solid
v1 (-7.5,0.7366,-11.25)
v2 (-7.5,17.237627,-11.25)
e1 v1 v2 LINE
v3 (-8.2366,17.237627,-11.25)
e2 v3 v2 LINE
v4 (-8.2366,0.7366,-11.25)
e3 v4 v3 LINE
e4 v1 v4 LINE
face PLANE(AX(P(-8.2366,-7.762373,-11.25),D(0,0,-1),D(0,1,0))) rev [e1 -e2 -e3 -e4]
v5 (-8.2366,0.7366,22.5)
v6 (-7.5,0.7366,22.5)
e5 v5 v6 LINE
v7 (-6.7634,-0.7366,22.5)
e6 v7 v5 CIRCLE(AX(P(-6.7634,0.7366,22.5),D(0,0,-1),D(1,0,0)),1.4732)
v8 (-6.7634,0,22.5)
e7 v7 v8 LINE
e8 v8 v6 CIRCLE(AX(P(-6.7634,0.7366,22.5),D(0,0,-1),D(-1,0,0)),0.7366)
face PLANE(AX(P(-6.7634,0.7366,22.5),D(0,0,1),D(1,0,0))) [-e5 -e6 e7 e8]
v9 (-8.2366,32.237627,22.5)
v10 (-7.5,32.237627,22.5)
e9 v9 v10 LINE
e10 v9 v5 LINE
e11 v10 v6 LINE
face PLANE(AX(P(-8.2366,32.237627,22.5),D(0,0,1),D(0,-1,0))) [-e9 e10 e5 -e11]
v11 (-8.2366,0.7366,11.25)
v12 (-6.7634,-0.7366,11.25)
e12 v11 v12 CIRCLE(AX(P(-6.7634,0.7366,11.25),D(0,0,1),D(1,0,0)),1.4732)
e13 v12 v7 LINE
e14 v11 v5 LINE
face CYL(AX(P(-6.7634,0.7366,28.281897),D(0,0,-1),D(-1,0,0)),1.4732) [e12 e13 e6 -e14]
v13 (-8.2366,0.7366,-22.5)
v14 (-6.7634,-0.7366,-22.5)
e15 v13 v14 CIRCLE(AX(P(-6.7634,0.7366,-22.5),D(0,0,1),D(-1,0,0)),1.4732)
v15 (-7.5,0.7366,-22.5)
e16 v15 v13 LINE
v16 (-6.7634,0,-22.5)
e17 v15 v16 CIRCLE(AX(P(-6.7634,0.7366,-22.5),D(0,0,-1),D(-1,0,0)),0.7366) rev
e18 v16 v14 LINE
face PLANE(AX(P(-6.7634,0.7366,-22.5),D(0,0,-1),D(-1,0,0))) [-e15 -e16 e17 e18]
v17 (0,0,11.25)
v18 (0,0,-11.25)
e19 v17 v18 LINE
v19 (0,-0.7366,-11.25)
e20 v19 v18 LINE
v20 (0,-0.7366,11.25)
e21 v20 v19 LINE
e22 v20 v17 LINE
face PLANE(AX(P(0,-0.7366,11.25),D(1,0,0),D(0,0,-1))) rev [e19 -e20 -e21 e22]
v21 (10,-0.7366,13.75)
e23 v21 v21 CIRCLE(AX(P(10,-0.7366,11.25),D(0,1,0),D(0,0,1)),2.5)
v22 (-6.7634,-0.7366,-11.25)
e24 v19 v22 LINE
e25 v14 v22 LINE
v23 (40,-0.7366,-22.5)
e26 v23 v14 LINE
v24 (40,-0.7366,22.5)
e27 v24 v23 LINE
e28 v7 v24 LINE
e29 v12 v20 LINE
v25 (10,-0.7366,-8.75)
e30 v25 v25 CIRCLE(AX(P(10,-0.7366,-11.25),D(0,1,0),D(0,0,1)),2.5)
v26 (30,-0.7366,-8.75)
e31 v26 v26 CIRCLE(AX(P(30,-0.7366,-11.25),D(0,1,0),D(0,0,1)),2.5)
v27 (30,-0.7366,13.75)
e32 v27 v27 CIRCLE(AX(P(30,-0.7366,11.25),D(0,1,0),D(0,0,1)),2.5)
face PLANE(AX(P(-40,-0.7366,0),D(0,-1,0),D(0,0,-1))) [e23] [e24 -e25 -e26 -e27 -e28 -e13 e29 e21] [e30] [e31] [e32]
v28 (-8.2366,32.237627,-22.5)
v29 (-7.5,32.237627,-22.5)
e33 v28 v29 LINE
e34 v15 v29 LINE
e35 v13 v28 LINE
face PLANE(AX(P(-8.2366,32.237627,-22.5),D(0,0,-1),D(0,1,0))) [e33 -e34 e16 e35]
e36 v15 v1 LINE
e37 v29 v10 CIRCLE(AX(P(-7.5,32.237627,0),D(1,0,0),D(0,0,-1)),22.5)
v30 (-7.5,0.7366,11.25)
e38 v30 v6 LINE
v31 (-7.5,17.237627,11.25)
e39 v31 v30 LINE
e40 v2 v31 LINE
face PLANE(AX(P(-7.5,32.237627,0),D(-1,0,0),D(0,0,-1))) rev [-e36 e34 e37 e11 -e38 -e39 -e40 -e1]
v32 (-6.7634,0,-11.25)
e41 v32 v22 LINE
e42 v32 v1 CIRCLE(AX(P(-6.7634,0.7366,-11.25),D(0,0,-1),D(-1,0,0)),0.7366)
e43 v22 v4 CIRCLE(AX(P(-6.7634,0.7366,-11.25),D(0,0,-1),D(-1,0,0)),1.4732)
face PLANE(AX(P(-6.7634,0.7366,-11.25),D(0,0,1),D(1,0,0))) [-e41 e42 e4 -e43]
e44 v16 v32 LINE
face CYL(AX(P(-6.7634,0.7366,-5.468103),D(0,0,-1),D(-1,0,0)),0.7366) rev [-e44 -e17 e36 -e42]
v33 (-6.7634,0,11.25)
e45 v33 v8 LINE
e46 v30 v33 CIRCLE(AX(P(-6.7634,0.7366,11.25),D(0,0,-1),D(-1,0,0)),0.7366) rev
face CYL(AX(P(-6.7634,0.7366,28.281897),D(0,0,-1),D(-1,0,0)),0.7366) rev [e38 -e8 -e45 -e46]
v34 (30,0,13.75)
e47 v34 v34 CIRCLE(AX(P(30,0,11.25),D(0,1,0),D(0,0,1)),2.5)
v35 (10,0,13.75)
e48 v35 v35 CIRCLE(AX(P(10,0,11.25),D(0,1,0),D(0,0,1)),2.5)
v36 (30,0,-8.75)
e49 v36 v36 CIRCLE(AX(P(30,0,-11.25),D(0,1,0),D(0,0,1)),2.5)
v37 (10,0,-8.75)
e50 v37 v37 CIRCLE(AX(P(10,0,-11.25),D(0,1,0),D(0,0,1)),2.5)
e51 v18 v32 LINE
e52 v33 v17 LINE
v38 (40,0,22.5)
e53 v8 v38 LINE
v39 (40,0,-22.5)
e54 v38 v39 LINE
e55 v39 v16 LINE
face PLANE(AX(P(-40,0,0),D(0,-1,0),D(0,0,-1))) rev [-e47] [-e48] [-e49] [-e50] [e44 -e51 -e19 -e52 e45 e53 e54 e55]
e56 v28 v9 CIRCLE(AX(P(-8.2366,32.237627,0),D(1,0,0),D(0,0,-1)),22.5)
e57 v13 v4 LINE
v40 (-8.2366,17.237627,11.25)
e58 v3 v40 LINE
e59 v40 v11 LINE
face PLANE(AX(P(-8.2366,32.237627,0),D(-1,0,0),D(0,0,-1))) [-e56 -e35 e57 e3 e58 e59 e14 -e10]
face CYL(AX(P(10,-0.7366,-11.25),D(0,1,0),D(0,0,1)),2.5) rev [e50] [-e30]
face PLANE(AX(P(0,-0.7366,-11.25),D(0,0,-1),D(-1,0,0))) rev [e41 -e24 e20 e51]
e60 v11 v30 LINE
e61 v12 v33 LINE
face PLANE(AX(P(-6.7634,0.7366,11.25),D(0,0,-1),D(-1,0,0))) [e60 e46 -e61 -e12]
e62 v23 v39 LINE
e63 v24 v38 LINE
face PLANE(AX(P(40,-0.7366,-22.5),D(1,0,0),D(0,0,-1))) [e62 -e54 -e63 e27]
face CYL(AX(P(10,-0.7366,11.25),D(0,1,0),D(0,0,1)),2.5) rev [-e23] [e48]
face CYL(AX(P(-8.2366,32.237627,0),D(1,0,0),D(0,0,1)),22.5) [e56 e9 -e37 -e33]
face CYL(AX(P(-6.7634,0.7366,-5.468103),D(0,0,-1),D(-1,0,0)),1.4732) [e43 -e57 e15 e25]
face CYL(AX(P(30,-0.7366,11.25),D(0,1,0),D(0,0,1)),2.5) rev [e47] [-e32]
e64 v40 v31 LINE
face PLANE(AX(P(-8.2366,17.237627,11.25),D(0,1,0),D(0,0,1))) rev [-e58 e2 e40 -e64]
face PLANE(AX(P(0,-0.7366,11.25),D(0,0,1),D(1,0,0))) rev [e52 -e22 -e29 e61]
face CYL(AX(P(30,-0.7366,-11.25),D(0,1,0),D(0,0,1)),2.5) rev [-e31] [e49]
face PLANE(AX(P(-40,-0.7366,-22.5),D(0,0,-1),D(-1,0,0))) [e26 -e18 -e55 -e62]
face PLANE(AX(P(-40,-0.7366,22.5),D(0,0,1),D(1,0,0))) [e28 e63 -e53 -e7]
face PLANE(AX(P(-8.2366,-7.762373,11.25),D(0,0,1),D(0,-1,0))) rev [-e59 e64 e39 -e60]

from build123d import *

# Parameters (mm, degrees)
SKETCH1_R                  = 2.5
SKETCH1_W                  = 25
SKETCH1_H                  = 22.5
BASE_FLANGE3_DEPTH         = 0.7366
SKETCHED_START             = -22.5
SKETCHED_BEND1_DEPTH       = 45
SKETCHED_BEND1_2_DEPTH     = 11.25
SKETCHED_START_2           = 11.25
SKETCHED_BEND1_3_DEPTH     = 11.25
SKETCHED_START_3           = -63
SKETCHED_BEND1_4_OUTLINE_W = 0.7366
SKETCHED_BEND1_4_OUTLINE_H = 45
SKETCHED_BEND1_4_DEPTH     = 38
SKETCHED_START_4           = -8.2366
SKETCHED_BEND1_5_DEPTH     = 0.7366


with BuildPart() as part:
    # Base-Flange3: sheet metal written as solids
    # Sketch1 → Base-Flange3 (new body)
    with BuildSketch(Plane(origin=(0, 0, 0), x_dir=(1, 0, 0), z_dir=(0, 1, 0))):
        with BuildLine():
            Line((-40, 22.5), (40, 22.5))
            Line((40, 22.5), (40, -22.5))
            Line((40, -22.5), (-40, -22.5))
            ThreePointArc((-40, -22.5), (-62.5, 0), (-40, 22.5))
        make_face()
        with Locations(Location((10, -11.25, 0), (0, 0, 270))):
            Circle(SKETCH1_R, mode=Mode.SUBTRACT)
        with Locations(Location((10, 11.25, 0), (0, 0, 270))):
            Circle(SKETCH1_R, mode=Mode.SUBTRACT)
        with Locations(Location((30, -11.25, 0), (0, 0, 270))):
            Circle(SKETCH1_R, mode=Mode.SUBTRACT)
        with Locations(Location((30, 11.25, 0), (0, 0, 270))):
            Circle(SKETCH1_R, mode=Mode.SUBTRACT)
        with Locations((-12.5, 0)):
            Rectangle(SKETCH1_W, SKETCH1_H, mode=Mode.SUBTRACT)
    extrude(amount=-BASE_FLANGE3_DEPTH)

    # Sketched Bend1: read off the stored shape, not the designer's step
    # Sketched Bend1 outline → Sketched Bend1 (cut)
    with BuildSketch(Plane.XY.offset(SKETCHED_START)):
        with BuildLine():
            ThreePointArc((-6.7634, -0.7366), (-7.5, -0.539228625), (-8.039228625, 0))
            Line((-8.039228625, 0), (-25, 0))
            Line((-25, 0), (-25, -0.7366))
            Line((-25, -0.7366), (-6.7634, -0.7366))
        make_face()
    extrude(amount=SKETCHED_BEND1_DEPTH, mode=Mode.SUBTRACT)

    # Sketched Bend1 2 outline → Sketched Bend1 2 (add)
    with BuildSketch(Plane.XY.offset(SKETCHED_START)):
        with BuildLine():
            Line((-7.5, 17.237627139), (-8.2366, 17.237627139))
            Line((-8.2366, 17.237627139), (-8.2366, 0.7366))
            ThreePointArc((-8.2366, 0.7366), (-8.186401927, 0.355307783), (-8.039228625, 0))
            Line((-8.039228625, 0), (-6.7634, 0))
            ThreePointArc((-6.7634, 0), (-7.284254855, 0.215745145), (-7.5, 0.7366))
            Line((-7.5, 0.7366), (-7.5, 17.237627139))
        make_face()
    extrude(amount=SKETCHED_BEND1_2_DEPTH)

    # Sketched Bend1 3 outline → Sketched Bend1 3 (add)
    with BuildSketch(Plane.XY.offset(SKETCHED_START_2)):
        with BuildLine():
            Line((-7.5, 17.237627139), (-8.2366, 17.237627139))
            Line((-8.2366, 17.237627139), (-8.2366, 0.7366))
            ThreePointArc((-8.2366, 0.7366), (-8.186401927, 0.355307783), (-8.039228625, 0))
            Line((-8.039228625, 0), (-6.7634, 0))
            ThreePointArc((-6.7634, 0), (-7.284254855, 0.215745145), (-7.5, 0.7366))
            Line((-7.5, 0.7366), (-7.5, 17.237627139))
        make_face()
    extrude(amount=SKETCHED_BEND1_3_DEPTH)

    # Sketched Bend1 4 outline → Sketched Bend1 4 (cut)
    with BuildSketch(Plane.YZ.offset(SKETCHED_START_3)):
        with Locations((-0.3683, 0)):
            Rectangle(SKETCHED_BEND1_4_OUTLINE_W, SKETCHED_BEND1_4_OUTLINE_H)
    extrude(amount=SKETCHED_BEND1_4_DEPTH, mode=Mode.SUBTRACT)

    # Sketched Bend1 5 outline → Sketched Bend1 5 (add)
    with BuildSketch(Plane.YZ.offset(SKETCHED_START_4)):
        with BuildLine():
            ThreePointArc((32.237627139, -22.5), (54.737627139, 0), (32.237627139, 22.5))
            Line((32.237627139, 22.5), (17.237627139, 22.5))
            Line((17.237627139, 22.5), (17.237627139, -22.5))
            Line((17.237627139, -22.5), (32.237627139, -22.5))
        make_face()
    extrude(amount=SKETCHED_BEND1_5_DEPTH)


solid = part.part
